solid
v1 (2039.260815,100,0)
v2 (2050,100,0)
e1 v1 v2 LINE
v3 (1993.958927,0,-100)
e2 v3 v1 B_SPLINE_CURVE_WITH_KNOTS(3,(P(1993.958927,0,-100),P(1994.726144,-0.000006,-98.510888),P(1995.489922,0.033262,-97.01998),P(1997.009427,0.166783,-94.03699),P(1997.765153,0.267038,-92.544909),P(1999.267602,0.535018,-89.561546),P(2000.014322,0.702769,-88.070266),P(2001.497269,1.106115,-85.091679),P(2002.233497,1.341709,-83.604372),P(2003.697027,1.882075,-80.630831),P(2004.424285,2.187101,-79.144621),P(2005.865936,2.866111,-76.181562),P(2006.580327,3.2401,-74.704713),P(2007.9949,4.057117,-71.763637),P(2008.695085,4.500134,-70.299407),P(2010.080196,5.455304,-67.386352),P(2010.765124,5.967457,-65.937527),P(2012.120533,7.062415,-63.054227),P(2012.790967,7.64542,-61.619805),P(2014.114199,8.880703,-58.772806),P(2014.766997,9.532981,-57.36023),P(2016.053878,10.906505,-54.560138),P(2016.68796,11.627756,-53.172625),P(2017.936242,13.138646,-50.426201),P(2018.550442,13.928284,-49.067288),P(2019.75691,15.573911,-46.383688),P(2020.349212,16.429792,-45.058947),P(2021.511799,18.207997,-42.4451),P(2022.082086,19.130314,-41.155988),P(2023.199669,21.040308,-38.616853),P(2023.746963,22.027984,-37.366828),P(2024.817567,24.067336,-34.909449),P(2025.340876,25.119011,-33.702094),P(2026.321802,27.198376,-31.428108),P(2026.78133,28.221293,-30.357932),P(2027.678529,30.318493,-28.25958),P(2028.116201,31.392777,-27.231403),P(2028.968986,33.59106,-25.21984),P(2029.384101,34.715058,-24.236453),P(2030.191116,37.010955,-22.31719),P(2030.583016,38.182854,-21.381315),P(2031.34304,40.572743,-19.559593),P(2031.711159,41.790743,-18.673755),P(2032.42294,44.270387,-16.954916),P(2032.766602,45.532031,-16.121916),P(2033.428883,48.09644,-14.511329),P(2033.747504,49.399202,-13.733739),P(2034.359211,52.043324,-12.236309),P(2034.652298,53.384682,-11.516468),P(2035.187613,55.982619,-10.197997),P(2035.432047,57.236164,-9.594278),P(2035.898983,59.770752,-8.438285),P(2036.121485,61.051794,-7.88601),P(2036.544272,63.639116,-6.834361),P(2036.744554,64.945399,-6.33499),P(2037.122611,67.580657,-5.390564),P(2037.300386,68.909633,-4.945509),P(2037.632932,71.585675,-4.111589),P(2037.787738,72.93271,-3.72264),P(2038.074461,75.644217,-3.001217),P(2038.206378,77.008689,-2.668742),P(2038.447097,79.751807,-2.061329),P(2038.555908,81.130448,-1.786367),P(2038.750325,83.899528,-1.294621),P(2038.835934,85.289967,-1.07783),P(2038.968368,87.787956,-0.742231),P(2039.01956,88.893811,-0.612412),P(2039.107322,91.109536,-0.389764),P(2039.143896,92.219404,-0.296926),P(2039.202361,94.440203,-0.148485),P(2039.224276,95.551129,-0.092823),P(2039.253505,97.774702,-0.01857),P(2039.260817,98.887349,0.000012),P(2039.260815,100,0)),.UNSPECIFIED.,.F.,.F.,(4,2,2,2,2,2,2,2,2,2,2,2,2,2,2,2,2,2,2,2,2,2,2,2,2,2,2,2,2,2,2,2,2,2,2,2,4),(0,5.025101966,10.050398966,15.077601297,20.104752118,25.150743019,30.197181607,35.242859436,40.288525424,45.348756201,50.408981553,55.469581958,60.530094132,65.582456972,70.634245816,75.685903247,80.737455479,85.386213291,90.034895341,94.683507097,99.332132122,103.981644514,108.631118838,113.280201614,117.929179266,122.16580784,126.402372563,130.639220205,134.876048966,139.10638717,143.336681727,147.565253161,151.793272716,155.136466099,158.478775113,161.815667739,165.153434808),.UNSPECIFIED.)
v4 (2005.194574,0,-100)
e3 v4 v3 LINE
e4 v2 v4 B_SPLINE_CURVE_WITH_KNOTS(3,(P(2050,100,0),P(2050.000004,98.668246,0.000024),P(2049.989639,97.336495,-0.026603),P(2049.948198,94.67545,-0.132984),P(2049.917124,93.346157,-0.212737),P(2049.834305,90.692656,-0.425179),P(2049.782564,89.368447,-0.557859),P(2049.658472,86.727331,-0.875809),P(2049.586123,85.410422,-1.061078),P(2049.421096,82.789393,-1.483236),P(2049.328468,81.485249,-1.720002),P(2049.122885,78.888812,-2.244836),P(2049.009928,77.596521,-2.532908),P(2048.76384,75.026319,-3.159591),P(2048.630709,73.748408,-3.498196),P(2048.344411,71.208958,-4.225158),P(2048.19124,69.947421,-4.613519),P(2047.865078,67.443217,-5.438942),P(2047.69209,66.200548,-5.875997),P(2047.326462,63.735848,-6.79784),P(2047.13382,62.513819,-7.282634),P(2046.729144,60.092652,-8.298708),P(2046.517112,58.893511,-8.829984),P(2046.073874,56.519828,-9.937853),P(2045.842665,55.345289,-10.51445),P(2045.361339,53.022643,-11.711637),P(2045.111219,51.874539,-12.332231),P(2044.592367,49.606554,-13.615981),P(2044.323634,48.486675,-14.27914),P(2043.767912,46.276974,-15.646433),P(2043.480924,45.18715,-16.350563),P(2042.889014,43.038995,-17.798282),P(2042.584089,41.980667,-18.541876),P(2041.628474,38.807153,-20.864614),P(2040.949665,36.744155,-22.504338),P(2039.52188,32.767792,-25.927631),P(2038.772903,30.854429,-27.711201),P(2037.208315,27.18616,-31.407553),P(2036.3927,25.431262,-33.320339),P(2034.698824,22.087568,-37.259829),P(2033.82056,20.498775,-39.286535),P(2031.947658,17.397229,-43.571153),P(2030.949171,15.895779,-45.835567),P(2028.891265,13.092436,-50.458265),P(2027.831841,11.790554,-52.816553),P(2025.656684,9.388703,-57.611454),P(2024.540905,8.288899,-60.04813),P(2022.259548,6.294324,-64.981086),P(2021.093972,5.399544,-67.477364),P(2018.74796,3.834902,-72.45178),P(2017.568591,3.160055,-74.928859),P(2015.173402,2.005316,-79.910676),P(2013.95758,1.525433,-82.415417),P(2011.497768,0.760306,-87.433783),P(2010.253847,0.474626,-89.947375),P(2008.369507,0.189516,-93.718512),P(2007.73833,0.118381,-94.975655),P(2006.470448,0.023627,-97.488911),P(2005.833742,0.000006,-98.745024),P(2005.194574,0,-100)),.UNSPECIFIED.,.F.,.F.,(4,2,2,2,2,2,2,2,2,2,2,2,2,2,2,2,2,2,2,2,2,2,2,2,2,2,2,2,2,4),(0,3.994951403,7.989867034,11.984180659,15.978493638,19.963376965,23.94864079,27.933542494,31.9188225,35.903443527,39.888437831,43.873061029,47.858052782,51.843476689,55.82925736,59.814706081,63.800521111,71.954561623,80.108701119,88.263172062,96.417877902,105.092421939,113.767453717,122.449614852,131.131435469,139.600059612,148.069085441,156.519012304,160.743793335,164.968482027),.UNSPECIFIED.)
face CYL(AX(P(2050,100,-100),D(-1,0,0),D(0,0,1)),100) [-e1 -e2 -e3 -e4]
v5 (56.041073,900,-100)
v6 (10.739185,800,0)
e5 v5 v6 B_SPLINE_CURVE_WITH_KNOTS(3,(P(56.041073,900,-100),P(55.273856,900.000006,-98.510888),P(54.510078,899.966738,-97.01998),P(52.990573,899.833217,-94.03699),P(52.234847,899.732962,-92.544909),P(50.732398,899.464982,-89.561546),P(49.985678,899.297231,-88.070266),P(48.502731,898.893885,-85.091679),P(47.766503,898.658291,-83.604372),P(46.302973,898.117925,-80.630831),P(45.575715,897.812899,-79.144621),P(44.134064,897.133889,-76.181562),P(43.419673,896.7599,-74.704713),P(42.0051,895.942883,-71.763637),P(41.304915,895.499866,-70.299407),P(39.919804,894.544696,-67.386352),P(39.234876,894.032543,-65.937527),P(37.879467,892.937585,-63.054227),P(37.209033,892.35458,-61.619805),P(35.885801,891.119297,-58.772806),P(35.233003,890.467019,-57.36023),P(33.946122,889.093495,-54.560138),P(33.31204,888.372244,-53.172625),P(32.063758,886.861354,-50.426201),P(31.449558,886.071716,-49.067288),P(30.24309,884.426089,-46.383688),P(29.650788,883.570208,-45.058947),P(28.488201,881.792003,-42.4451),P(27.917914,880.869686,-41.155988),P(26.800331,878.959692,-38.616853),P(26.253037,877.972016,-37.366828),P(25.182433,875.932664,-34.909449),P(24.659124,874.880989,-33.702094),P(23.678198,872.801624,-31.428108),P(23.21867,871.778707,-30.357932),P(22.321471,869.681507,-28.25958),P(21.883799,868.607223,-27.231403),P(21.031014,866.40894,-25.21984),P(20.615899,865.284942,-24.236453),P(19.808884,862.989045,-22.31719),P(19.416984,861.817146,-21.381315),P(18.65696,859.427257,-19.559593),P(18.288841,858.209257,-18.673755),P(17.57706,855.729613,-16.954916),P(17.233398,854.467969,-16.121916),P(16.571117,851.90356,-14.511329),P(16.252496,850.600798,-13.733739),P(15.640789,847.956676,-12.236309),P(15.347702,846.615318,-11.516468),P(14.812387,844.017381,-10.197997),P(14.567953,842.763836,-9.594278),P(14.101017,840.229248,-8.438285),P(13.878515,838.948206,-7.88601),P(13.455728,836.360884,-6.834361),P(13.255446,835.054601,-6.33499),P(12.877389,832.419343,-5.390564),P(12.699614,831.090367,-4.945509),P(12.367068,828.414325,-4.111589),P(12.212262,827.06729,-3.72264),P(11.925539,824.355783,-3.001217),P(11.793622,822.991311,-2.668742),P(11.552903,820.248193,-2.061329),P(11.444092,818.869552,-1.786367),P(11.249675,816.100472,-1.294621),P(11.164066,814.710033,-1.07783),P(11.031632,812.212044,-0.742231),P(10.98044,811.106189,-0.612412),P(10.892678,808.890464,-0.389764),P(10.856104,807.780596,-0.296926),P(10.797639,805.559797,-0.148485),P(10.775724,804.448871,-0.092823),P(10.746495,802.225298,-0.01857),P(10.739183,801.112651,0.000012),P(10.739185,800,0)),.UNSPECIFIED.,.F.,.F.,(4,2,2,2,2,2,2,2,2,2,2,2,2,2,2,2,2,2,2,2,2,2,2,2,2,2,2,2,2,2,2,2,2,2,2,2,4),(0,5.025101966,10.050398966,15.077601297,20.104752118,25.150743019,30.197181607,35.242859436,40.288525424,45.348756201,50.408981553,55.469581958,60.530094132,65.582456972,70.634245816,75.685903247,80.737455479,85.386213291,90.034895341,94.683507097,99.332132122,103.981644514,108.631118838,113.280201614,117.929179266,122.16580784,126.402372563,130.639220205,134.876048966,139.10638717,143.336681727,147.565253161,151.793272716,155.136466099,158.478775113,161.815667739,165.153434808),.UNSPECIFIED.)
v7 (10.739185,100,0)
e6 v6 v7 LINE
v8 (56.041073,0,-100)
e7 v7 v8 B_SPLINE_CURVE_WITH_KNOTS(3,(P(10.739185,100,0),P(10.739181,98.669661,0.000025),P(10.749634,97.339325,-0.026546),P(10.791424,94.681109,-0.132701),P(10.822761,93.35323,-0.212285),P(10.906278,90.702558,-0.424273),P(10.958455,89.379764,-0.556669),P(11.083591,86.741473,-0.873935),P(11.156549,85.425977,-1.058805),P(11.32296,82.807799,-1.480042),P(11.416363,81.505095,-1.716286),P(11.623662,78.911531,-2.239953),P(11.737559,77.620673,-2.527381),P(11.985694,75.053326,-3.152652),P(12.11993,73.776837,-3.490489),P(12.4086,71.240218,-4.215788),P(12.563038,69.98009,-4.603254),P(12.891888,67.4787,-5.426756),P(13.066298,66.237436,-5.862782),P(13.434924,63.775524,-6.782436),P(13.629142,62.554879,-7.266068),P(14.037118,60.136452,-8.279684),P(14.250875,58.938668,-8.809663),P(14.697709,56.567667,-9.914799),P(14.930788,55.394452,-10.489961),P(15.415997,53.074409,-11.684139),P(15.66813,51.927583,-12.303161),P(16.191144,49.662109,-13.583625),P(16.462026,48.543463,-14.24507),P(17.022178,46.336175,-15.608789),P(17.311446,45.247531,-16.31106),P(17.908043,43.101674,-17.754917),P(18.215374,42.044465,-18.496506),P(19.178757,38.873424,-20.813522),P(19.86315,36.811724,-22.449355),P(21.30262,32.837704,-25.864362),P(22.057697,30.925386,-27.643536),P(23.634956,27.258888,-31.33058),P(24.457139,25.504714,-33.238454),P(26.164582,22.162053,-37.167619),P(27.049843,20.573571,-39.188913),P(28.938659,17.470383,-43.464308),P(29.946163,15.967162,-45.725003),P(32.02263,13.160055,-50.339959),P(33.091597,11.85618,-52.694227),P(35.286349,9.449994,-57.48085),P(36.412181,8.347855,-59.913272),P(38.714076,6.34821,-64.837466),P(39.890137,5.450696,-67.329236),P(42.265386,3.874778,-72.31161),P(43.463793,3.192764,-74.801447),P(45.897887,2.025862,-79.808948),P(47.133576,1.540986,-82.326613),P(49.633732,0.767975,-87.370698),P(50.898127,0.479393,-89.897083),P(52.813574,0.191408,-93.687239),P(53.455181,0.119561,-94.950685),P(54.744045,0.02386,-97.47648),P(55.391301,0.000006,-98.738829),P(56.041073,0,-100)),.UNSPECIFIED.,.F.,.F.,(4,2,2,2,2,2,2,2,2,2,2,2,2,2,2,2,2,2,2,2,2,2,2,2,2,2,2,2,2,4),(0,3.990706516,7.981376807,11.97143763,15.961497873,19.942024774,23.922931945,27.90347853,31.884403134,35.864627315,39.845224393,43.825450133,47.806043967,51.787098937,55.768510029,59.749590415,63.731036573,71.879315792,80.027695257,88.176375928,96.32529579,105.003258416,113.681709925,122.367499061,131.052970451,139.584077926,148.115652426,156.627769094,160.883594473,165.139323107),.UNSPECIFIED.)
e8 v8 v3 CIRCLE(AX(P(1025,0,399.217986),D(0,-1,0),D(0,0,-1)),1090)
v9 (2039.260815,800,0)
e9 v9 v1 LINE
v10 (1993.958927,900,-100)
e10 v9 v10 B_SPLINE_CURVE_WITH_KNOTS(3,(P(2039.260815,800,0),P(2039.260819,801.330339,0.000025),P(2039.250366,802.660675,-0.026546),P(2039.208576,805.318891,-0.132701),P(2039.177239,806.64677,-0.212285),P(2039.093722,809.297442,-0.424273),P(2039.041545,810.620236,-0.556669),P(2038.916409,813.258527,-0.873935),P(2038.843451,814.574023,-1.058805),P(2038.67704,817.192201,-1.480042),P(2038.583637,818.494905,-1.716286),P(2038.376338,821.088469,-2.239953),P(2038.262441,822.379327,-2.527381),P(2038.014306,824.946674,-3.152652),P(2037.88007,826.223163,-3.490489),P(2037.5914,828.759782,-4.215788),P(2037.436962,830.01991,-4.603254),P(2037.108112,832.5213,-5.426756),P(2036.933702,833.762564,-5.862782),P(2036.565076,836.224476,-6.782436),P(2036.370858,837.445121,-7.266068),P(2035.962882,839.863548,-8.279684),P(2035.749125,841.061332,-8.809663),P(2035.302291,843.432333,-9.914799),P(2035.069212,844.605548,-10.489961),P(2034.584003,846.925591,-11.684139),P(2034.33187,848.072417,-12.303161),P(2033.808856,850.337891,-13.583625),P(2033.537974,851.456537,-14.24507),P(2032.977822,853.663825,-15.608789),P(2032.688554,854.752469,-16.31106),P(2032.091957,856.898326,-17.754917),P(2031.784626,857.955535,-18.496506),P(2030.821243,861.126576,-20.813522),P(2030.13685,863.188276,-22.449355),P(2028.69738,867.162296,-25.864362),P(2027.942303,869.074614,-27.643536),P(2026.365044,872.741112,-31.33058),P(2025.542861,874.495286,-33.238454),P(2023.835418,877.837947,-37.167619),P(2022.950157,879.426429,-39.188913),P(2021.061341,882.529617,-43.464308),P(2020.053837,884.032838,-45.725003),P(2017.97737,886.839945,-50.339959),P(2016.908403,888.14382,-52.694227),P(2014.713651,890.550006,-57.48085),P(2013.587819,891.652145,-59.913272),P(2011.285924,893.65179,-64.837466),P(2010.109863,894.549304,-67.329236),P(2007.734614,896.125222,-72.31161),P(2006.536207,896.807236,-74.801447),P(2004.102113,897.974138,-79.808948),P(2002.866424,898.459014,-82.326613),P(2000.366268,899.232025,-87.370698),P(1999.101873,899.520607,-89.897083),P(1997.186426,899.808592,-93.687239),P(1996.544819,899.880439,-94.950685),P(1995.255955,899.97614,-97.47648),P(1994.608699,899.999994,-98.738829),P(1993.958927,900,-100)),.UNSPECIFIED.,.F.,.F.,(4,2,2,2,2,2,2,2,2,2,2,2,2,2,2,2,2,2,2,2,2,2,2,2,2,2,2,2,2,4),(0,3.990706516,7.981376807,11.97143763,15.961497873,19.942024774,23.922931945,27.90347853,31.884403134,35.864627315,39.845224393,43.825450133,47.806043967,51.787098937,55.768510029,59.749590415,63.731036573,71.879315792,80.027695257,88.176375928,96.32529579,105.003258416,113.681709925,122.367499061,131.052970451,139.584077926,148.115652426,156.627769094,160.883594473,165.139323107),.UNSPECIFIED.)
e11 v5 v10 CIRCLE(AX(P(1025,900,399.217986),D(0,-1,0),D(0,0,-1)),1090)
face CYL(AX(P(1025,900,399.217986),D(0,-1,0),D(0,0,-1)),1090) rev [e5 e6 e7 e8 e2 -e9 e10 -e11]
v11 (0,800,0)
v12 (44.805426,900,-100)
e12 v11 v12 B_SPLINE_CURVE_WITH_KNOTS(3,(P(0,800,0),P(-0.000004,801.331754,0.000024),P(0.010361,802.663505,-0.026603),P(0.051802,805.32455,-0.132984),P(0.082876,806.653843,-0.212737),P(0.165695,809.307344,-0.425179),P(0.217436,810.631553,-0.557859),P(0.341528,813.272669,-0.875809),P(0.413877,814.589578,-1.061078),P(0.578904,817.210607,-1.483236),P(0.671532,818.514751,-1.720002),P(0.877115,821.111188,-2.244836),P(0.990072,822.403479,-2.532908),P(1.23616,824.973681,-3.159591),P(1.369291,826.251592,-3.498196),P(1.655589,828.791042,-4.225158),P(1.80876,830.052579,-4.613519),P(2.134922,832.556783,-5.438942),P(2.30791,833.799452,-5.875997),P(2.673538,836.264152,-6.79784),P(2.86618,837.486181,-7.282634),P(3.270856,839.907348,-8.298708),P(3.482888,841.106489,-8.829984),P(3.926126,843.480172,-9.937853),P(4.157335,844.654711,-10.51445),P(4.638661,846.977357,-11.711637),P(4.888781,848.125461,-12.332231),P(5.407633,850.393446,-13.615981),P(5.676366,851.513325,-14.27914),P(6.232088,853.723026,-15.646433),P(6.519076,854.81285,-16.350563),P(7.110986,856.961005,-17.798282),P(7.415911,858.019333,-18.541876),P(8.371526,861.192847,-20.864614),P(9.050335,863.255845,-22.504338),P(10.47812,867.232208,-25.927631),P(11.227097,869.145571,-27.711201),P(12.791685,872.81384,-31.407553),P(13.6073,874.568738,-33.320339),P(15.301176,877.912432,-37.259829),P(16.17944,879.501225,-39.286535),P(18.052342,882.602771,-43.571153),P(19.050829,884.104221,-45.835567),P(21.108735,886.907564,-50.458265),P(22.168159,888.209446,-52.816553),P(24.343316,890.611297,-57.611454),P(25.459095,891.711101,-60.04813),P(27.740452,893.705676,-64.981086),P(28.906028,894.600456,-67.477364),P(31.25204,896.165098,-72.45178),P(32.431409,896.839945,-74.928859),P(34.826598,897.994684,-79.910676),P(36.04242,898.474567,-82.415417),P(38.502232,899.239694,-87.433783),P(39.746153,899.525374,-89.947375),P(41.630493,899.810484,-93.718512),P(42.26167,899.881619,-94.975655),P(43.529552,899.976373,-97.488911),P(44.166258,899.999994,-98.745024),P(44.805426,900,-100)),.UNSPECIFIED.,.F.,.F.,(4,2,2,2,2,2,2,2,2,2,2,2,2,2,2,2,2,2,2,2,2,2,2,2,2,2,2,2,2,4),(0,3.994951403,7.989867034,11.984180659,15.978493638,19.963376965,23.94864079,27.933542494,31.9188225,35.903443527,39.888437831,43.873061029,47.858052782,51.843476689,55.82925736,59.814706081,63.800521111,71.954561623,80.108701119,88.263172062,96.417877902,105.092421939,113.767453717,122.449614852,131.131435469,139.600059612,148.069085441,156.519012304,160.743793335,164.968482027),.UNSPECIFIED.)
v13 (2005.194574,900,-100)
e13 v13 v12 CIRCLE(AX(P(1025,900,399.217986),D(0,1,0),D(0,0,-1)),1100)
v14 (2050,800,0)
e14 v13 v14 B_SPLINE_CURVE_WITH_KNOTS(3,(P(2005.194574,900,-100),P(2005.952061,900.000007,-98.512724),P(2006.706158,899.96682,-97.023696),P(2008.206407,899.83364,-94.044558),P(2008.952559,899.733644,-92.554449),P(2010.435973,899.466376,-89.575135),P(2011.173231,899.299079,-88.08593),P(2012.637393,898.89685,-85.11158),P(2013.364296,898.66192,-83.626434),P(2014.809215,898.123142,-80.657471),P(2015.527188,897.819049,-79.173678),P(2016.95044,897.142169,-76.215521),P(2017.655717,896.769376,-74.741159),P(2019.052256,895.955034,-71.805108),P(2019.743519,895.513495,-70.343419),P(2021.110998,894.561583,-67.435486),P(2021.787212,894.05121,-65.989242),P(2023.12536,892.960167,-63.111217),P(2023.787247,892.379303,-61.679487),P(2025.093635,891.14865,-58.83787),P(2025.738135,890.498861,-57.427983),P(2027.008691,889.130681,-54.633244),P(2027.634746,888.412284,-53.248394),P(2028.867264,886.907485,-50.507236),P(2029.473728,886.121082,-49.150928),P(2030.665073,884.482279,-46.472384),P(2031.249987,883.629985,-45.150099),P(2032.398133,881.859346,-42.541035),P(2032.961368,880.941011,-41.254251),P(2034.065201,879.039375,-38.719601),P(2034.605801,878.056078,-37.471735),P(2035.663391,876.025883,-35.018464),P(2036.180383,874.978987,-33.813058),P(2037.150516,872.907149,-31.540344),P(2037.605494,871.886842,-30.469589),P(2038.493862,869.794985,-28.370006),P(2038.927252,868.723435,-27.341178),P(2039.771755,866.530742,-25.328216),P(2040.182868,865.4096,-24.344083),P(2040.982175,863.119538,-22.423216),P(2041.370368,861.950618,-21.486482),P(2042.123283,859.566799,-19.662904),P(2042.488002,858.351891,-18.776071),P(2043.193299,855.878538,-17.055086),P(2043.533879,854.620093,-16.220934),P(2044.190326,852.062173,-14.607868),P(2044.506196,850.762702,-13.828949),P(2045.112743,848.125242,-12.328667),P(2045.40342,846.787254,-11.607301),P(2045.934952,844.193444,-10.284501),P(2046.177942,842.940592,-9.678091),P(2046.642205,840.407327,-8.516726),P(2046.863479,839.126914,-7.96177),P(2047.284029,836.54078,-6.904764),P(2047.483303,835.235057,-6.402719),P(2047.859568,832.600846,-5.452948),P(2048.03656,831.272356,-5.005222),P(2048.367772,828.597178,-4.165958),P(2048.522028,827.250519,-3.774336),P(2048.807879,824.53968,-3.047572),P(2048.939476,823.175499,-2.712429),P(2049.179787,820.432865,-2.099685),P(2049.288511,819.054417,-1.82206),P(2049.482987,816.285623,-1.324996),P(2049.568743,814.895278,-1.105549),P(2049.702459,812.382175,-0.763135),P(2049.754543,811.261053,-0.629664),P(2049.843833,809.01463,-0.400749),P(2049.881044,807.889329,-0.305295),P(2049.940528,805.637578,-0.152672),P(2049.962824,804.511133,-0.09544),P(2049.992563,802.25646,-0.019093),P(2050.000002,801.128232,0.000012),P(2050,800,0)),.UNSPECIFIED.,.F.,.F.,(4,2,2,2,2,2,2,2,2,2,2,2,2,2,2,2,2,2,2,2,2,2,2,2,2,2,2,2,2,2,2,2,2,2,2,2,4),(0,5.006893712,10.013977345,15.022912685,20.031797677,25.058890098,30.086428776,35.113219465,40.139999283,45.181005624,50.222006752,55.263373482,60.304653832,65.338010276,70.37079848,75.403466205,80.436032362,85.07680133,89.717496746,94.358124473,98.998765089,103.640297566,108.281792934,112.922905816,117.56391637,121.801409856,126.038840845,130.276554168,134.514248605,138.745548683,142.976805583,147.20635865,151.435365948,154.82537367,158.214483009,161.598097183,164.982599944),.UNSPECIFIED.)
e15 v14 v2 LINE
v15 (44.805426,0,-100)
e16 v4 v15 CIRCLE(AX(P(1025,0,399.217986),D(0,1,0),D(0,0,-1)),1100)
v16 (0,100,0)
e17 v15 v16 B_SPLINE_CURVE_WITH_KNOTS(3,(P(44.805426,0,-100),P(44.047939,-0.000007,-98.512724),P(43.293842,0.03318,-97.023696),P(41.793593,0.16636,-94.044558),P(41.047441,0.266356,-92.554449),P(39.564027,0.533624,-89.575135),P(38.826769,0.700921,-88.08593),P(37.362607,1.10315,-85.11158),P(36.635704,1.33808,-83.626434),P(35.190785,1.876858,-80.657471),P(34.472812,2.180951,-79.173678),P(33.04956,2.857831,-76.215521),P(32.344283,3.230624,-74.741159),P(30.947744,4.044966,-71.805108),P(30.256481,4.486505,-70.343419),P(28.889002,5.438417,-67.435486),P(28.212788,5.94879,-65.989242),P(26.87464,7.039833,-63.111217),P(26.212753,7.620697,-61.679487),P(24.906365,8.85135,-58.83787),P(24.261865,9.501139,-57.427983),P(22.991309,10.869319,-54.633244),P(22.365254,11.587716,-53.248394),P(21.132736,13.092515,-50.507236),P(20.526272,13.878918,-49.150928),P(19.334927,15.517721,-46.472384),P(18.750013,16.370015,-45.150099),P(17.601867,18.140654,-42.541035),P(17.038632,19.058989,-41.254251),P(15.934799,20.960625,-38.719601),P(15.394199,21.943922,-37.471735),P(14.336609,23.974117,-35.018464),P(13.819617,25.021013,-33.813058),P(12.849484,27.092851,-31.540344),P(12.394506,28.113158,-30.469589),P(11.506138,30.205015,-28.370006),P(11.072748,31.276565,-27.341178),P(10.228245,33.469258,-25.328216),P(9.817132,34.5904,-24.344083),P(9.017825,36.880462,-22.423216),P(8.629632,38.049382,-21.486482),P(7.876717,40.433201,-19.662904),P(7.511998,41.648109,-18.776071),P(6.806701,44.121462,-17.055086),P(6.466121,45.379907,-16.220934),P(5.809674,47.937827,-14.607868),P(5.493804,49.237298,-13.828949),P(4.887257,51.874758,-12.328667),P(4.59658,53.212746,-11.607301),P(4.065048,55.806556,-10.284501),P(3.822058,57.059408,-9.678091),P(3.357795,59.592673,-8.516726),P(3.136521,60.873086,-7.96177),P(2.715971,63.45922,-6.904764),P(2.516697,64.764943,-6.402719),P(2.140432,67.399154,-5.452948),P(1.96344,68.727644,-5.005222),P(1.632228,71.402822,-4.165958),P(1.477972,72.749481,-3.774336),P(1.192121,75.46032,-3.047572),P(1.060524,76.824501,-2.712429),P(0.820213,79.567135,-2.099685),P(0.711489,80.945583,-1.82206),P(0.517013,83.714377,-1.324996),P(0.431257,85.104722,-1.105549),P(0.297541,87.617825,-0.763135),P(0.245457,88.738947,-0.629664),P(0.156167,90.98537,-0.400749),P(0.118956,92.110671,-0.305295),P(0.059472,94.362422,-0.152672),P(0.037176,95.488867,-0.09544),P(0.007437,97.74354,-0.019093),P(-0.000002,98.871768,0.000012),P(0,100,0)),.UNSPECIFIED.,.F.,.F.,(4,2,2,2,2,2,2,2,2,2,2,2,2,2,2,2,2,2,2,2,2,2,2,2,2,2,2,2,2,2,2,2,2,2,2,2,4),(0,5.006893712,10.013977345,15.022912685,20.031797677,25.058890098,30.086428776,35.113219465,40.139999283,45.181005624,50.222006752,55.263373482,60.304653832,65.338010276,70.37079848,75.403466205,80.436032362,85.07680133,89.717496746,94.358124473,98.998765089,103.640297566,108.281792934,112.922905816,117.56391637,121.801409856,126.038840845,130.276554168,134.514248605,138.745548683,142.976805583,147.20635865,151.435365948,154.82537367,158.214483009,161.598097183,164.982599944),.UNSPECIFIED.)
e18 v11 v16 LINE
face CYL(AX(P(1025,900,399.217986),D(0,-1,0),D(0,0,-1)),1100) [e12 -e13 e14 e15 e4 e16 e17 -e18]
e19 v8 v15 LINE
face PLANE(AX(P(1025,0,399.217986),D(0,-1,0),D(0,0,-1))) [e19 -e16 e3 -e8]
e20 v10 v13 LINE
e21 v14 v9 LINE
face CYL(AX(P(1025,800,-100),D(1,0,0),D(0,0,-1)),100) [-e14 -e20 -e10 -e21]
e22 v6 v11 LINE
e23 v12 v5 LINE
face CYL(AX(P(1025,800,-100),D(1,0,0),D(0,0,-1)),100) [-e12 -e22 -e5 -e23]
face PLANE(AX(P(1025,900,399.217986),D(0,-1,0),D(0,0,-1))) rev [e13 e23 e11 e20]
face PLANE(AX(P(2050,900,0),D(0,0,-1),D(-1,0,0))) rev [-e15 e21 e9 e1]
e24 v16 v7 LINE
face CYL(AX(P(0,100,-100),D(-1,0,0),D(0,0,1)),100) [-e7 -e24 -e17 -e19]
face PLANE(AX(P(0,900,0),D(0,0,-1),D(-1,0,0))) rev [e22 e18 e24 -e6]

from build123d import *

# Parameters (mm, degrees)
BOSS_EXTRUDE1_DEPTH = 900
FILLET1_START       = -1
FILLET1_DEPTH       = 2052


with BuildPart() as part:
    # Sketch1 → Boss-Extrude1 (new body)
    with BuildSketch(Plane(origin=(0, 0, 0), x_dir=(1, 0, 0), z_dir=(0, 1, 0))):
        with BuildLine():
            Line((0, 0), (10.739185416, 0))
            ThreePointArc((10.739185416, 0), (1025, 690.782014433), (2039.260814584, 0))
            Line((2039.260814584, 0), (2050, 0))
            ThreePointArc((2050, 0), (1025, 700.782014433), (0, 0))
        make_face()
    extrude(amount=BOSS_EXTRUDE1_DEPTH)

    # Fillet1: read off the stored shape, not the designer's step
    # Fillet1 outline → Fillet1 (cut)
    with BuildSketch(Plane.YZ.offset(FILLET1_START)):
        with BuildLine():
            ThreePointArc((0, -100), (29.289321881, -29.289321881), (100, 0))
            Line((100, 0), (0, 0))
            Line((0, 0), (0, -100))
        make_face()
        with BuildLine():
            ThreePointArc((800, 0), (870.710678119, -29.289321881), (900, -100))
            Line((900, -100), (900, 0))
            Line((900, 0), (800, 0))
        make_face()
    extrude(amount=FILLET1_DEPTH, mode=Mode.SUBTRACT)


solid = part.part
